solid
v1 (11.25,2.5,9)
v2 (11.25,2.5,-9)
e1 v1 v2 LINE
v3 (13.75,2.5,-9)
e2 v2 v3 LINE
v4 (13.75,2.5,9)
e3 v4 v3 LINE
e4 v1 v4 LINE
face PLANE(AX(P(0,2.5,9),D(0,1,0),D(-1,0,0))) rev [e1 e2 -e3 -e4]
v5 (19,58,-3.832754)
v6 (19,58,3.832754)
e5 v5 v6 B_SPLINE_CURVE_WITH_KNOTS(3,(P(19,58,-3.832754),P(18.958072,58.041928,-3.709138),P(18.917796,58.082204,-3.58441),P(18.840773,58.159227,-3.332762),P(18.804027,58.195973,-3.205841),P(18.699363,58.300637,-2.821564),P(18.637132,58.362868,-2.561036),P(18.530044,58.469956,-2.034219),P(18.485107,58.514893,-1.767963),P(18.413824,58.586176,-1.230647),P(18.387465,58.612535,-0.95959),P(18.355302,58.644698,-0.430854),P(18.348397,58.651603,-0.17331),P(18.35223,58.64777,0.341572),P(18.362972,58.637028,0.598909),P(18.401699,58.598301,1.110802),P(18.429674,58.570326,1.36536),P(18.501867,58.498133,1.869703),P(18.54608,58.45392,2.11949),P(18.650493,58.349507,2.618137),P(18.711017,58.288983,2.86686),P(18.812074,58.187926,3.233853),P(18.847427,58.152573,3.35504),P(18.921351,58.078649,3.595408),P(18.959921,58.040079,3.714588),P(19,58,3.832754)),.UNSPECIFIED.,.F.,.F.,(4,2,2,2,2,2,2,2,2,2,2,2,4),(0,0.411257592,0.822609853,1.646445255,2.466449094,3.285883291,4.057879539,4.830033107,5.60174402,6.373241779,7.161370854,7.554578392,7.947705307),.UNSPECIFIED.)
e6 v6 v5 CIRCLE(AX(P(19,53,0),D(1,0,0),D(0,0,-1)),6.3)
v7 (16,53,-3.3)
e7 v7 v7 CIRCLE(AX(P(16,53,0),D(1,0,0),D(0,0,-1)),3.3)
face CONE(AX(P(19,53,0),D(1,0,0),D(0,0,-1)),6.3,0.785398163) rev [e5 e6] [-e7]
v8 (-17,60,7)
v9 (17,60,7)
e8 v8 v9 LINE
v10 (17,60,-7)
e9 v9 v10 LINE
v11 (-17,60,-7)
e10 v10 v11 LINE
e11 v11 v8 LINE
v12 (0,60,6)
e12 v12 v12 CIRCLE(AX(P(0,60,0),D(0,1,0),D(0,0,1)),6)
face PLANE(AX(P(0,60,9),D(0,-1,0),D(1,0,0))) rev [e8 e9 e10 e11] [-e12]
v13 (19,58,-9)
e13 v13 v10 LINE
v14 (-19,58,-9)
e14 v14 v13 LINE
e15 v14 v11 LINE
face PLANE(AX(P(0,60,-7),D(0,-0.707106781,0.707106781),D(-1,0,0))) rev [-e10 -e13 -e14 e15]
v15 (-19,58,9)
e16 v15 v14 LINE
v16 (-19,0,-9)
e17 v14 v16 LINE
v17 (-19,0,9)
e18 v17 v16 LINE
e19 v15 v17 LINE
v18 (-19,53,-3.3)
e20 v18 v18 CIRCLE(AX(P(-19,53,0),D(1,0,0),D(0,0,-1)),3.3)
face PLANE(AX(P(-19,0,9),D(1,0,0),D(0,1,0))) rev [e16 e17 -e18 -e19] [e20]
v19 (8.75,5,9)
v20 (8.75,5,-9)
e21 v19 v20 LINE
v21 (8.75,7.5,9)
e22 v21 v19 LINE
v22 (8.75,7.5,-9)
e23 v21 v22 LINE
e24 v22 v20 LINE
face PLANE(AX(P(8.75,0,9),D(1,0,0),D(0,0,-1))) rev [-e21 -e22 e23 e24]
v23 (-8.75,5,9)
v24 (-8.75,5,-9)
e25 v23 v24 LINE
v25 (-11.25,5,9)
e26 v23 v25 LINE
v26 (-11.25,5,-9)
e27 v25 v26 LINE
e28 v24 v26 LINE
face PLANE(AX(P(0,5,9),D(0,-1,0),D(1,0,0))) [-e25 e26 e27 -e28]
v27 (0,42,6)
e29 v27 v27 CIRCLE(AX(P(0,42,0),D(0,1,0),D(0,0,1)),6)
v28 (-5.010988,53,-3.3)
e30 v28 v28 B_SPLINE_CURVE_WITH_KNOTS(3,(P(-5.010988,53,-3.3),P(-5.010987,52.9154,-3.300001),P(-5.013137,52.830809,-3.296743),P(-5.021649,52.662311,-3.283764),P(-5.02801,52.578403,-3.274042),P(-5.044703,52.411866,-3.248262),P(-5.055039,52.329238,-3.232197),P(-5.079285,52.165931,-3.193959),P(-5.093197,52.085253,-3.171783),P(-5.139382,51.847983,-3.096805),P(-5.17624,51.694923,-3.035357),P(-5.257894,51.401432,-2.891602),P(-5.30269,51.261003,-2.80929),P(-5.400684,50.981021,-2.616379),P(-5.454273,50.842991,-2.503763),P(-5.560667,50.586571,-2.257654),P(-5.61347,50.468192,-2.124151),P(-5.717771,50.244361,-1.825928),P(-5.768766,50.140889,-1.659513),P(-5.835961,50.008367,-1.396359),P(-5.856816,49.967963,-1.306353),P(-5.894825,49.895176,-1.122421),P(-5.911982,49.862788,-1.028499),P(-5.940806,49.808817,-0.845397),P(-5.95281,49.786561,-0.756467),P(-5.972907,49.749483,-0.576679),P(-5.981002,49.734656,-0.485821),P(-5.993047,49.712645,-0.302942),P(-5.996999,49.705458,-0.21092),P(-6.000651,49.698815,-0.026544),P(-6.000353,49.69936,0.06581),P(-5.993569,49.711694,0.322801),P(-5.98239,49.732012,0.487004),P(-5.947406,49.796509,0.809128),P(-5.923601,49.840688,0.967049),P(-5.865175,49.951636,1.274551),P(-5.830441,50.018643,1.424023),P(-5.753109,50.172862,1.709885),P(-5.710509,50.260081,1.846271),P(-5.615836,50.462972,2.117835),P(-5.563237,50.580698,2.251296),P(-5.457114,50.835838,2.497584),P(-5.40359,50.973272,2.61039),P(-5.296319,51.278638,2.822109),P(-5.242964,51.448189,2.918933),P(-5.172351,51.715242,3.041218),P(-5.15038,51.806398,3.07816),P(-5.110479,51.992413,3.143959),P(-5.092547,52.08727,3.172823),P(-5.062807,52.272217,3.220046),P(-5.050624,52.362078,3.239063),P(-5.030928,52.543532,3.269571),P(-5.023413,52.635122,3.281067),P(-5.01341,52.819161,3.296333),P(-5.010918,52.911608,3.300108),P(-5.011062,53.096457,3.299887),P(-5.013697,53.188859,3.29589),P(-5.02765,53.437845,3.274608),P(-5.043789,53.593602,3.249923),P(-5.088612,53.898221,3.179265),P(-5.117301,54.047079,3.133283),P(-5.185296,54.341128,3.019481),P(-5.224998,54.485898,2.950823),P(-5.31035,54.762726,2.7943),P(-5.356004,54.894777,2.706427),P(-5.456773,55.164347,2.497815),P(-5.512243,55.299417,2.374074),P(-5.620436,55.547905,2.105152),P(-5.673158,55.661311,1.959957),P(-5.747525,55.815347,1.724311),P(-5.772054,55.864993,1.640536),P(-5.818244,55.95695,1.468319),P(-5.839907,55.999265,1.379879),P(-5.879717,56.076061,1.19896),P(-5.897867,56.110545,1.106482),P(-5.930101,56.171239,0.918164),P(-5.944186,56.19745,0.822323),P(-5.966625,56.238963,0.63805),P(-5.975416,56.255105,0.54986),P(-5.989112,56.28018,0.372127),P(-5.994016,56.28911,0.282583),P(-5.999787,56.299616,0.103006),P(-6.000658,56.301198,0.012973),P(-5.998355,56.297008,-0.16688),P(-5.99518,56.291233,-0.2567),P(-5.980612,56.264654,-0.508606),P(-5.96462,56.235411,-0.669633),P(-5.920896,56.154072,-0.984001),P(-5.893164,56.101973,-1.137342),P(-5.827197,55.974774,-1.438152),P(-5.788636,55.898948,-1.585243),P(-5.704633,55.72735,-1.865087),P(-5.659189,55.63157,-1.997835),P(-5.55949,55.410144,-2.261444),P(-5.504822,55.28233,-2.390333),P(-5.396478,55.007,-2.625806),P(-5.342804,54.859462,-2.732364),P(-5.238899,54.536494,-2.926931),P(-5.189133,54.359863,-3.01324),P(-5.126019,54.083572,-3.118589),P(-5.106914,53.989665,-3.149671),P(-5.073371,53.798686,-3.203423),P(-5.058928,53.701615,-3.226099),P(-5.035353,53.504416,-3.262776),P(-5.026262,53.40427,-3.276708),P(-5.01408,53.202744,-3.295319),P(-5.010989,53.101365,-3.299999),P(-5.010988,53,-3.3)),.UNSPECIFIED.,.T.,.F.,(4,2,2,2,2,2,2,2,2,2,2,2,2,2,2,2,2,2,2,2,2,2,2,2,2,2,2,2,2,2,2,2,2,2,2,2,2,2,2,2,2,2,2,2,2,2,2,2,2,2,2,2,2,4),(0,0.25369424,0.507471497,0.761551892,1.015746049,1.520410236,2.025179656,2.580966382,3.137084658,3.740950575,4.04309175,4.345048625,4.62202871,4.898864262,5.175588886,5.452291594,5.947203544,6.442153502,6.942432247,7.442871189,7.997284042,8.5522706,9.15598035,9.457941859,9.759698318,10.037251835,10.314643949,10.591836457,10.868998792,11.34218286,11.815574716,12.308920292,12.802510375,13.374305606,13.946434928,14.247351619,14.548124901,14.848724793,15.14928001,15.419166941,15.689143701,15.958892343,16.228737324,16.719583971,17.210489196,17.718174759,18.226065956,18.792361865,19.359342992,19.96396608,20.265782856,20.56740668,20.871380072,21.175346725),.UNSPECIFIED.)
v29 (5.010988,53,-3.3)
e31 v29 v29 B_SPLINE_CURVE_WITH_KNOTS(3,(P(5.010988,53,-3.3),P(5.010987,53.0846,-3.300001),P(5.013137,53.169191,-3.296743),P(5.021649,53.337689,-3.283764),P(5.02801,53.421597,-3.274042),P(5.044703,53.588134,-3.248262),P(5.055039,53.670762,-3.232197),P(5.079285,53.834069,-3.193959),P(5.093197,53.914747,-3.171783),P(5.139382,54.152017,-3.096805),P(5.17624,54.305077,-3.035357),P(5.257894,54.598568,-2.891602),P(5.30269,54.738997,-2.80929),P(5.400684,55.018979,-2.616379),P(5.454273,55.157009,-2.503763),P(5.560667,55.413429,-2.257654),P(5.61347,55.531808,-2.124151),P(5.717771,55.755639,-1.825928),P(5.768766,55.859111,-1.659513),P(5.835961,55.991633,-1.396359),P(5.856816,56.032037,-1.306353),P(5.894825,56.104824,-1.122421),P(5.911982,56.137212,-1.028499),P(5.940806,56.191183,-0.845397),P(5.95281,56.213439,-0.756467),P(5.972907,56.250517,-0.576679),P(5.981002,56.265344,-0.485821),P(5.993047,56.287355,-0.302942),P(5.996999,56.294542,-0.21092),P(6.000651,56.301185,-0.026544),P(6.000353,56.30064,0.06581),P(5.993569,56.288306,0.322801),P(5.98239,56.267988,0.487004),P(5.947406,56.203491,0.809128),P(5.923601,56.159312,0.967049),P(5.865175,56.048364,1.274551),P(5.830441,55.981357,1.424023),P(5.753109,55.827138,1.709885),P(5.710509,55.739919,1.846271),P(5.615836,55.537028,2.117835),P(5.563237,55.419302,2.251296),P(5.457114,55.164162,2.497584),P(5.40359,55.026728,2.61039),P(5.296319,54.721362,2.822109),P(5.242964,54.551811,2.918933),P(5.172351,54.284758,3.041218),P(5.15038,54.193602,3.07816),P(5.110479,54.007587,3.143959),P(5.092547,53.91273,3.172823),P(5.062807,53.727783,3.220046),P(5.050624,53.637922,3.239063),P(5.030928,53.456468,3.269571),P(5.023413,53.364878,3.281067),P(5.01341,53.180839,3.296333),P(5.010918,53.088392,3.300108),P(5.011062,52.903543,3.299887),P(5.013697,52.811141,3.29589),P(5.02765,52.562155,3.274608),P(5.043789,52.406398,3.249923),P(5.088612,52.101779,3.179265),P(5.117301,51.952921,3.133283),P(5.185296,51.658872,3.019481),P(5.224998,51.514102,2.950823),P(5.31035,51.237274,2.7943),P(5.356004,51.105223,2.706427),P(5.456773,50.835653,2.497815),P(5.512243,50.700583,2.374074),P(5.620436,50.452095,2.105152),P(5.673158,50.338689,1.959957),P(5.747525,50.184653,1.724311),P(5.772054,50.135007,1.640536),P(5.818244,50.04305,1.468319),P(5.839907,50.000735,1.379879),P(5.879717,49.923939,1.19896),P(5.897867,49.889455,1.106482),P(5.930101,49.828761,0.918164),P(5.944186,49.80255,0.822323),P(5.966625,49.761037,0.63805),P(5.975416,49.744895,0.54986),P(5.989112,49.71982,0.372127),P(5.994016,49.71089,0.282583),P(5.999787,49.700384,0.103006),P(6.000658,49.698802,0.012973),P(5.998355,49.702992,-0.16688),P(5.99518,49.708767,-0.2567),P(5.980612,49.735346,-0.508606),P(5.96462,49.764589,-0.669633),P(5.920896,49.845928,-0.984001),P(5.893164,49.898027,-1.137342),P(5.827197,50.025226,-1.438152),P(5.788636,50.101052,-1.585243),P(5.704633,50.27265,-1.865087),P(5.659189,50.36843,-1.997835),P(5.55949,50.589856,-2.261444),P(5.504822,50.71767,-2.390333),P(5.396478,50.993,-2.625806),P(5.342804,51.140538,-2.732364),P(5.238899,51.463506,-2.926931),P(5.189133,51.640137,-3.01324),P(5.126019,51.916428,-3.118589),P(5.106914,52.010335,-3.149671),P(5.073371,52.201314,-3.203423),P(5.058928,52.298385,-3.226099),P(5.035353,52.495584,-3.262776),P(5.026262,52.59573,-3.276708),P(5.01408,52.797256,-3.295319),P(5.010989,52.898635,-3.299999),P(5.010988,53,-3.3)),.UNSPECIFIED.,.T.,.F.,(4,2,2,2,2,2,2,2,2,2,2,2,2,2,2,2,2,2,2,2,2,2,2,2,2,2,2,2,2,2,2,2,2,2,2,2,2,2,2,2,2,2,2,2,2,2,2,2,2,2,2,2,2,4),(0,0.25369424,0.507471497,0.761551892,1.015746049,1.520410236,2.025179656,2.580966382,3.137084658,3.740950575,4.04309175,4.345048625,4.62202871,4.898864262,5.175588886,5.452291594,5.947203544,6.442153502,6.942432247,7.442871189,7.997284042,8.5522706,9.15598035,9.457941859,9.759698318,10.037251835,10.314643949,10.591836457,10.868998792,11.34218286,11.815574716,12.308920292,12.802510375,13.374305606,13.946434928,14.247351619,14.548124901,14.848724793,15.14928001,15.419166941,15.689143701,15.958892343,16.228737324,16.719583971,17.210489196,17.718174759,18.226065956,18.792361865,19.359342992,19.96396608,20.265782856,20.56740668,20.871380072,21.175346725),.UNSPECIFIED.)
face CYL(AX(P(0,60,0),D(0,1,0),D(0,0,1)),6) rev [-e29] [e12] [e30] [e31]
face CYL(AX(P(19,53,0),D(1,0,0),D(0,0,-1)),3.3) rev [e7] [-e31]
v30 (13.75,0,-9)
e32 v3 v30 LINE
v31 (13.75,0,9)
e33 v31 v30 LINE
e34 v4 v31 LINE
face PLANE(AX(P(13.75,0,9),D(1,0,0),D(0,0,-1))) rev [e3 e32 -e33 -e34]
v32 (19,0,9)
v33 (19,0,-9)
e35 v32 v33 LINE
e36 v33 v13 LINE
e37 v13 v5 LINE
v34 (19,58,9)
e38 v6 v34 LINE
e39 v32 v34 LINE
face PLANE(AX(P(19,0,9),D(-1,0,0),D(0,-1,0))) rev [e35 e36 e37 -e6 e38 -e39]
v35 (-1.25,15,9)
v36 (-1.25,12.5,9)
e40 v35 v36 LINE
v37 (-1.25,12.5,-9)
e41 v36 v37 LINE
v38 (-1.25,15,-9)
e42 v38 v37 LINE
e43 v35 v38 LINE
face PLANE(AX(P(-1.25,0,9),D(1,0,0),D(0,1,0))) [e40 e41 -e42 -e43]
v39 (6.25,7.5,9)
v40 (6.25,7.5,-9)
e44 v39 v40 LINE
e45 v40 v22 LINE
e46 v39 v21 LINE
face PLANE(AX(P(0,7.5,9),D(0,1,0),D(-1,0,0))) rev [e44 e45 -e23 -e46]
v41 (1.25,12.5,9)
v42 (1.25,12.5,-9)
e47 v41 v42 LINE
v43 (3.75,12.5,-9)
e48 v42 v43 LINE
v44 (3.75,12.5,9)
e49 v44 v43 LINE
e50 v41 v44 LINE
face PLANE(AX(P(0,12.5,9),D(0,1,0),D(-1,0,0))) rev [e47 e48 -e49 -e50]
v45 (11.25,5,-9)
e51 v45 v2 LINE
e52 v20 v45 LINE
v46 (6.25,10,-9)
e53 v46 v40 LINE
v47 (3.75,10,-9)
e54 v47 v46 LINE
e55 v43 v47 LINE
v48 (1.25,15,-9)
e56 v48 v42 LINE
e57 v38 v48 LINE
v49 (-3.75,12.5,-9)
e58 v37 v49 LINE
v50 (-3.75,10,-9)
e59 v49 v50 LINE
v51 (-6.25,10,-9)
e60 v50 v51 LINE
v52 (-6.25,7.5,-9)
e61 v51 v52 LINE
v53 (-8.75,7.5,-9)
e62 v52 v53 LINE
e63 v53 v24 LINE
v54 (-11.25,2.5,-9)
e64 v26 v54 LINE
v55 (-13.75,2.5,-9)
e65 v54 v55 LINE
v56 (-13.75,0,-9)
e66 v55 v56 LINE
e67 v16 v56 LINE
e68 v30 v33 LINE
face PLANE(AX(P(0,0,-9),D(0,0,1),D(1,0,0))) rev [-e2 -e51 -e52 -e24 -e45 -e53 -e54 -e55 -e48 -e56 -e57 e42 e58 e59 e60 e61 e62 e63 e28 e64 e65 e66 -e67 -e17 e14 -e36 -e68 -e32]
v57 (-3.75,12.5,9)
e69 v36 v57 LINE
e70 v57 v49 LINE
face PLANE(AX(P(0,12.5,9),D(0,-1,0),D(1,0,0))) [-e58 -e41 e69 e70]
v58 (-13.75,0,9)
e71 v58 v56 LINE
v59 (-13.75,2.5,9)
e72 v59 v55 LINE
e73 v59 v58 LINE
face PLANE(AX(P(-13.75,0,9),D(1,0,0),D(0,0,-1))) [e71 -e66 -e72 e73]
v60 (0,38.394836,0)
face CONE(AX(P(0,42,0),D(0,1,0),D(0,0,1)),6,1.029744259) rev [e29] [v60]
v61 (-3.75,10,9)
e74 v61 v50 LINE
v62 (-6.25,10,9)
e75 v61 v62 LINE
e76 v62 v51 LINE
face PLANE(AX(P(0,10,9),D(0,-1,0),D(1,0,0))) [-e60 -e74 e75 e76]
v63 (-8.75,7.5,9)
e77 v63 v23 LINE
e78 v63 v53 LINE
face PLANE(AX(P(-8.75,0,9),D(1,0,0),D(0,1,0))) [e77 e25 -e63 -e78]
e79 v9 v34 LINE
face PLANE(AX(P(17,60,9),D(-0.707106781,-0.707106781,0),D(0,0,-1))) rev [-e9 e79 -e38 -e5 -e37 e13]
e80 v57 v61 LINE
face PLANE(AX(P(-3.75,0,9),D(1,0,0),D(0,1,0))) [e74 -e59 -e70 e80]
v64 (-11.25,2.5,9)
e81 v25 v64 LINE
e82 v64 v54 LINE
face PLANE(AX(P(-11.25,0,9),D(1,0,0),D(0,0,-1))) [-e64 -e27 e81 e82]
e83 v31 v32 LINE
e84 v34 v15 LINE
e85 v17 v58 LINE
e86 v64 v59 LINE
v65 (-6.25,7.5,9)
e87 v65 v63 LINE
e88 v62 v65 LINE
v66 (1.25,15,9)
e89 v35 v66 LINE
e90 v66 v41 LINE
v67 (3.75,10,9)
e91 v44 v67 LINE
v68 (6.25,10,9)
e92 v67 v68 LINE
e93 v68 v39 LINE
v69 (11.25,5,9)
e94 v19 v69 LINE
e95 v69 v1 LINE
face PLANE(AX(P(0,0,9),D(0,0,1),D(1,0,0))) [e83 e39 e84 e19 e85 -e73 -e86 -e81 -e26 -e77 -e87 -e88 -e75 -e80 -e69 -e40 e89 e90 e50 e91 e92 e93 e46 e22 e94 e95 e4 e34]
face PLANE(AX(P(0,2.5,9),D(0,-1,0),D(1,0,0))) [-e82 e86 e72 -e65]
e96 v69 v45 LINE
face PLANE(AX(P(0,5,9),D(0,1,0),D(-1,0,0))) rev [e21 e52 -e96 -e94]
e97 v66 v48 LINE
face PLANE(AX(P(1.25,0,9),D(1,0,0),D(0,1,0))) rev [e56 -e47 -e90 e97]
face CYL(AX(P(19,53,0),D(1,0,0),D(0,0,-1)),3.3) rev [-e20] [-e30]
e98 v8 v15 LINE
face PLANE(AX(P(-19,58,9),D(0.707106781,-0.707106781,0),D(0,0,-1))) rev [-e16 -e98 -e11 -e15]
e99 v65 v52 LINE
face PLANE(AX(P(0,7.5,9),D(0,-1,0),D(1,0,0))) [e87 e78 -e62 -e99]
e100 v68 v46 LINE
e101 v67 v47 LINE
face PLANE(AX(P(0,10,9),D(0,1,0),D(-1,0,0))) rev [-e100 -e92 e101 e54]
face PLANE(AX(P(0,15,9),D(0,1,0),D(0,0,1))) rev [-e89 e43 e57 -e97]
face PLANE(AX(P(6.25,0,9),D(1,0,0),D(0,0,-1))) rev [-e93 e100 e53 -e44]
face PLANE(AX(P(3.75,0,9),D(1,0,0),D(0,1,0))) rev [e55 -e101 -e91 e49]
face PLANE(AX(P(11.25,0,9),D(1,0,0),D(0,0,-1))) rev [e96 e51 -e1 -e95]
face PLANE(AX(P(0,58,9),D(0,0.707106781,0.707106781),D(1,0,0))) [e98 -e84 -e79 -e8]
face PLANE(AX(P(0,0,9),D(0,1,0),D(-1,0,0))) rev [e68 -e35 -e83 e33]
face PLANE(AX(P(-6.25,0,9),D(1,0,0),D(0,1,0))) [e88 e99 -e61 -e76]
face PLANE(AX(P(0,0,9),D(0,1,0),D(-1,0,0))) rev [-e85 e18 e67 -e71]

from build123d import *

# Parameters (mm, degrees)
BOSS_EXTRUDE1_DEPTH                             = 9
F_12_0MM_DOWEL_HOLE1_D                          = 12
F_12_0MM_DOWEL_HOLE1_DEPTH                      = 18
F_12_0MM_DOWEL_HOLE1_TIP                        = 3.605163714
CSK_FOR_M6_FLAT_HEAD_MACHINE_SCREW2_D           = 6.6
CSK_FOR_M6_FLAT_HEAD_MACHINE_SCREW2_DEPTH       = 38
CSK_FOR_M6_FLAT_HEAD_MACHINE_SCREW2_CSINK_D     = 12.6
CSK_FOR_M6_FLAT_HEAD_MACHINE_SCREW2_CSINK_ANGLE = 90
CSK_FOR_M6_FLAT_HEAD_MACHINE_SCREW2_TIP         = 1.982840043
CHAMFER1_SIZE                                   = 2


with BuildPart() as part:
    # Sketch1 → Boss-Extrude1 (new, symmetric)
    with BuildSketch(Plane.XY):
        Polygon((19, 60), (-19, 60), (-19, 0), (-13.75, 0), (-13.75, 2.5), (-11.25, 2.5), (-11.25, 5), (-8.75, 5), (-8.75, 7.5), (-6.25, 7.5), (-6.25, 10), (-3.75, 10), (-3.75, 12.5), (-1.25, 12.5), (-1.25, 15), (1.25, 15), (1.25, 12.5), (3.75, 12.5), (3.75, 10), (6.25, 10), (6.25, 7.5), (8.75, 7.5), (8.75, 5), (11.25, 5), (11.25, 2.5), (13.75, 2.5), (13.75, 0), (19, 0), align=None)
    extrude(amount=BOSS_EXTRUDE1_DEPTH, both=True)

    # Ø12.0mm Dowel Hole1
    with Locations(Plane(origin=(0, 60, 0), x_dir=(1, 0, 0), z_dir=(0, 1, 0))):
        with Locations((0, 0)):
            Hole(F_12_0MM_DOWEL_HOLE1_D / 2, depth=F_12_0MM_DOWEL_HOLE1_DEPTH)
            with Locations((0, 0, -(F_12_0MM_DOWEL_HOLE1_DEPTH + F_12_0MM_DOWEL_HOLE1_TIP / 2))):  # 118° drill point
                Cone(0, F_12_0MM_DOWEL_HOLE1_D / 2, F_12_0MM_DOWEL_HOLE1_TIP, mode=Mode.SUBTRACT)

    # CSK for M6 Flat Head Machine Screw2
    with Locations(Plane(origin=(19, 0, 0), x_dir=(0, 0, -1), z_dir=(1, 0, 0))):
        with Locations((0, 53)):
            CounterSinkHole(CSK_FOR_M6_FLAT_HEAD_MACHINE_SCREW2_D / 2, CSK_FOR_M6_FLAT_HEAD_MACHINE_SCREW2_CSINK_D / 2, depth=CSK_FOR_M6_FLAT_HEAD_MACHINE_SCREW2_DEPTH, counter_sink_angle=CSK_FOR_M6_FLAT_HEAD_MACHINE_SCREW2_CSINK_ANGLE)
            with Locations((0, 0, -(CSK_FOR_M6_FLAT_HEAD_MACHINE_SCREW2_DEPTH + CSK_FOR_M6_FLAT_HEAD_MACHINE_SCREW2_TIP / 2))):  # 118° drill point
                Cone(0, CSK_FOR_M6_FLAT_HEAD_MACHINE_SCREW2_D / 2, CSK_FOR_M6_FLAT_HEAD_MACHINE_SCREW2_TIP, mode=Mode.SUBTRACT)

    # Chamfer1
    # the kernel refuses this chamfer: 2 mm, written as the material it takes off along each edge
    with BuildSketch(Plane(origin=(24.143365976, 60, -9), x_dir=(0, 0.027495876610585623, 0.9996219169112968), z_dir=(-1, 0, 0))) as chamfer1_piece_1:
        Polygon((CHAMFER1_SIZE * 0.999621916911, -CHAMFER1_SIZE * 0.0274958766106), (-CHAMFER1_SIZE * 0.0274958766106, -CHAMFER1_SIZE * 0.999621916911), (0, 0), align=None)
    extrude(amount=48.286731952, mode=Mode.SUBTRACT)
    with BuildSketch(Plane(origin=(-19, 60, -14.143365976), x_dir=(-0.027495876610585647, -0.9996219169112968, 0), z_dir=(0, 0, 1)), Plane(origin=(19, 60, -14.143365976), x_dir=(-0.9996219169112968, 0.027495876610585647, 0), z_dir=(0, 0, 1))) as chamfer1_piece_2:
        Polygon((CHAMFER1_SIZE * 0.999621916911, CHAMFER1_SIZE * 0.0274958766106), (-CHAMFER1_SIZE * 0.0274958766106, CHAMFER1_SIZE * 0.999621916911), (0, 0), align=None)
    extrude(amount=28.286731952, mode=Mode.SUBTRACT)
    with BuildSketch(Plane(origin=(24.143365976, 60, 9), x_dir=(0, 0.027495876610585623, -0.9996219169112968), z_dir=(-1, 0, 0))) as chamfer1_piece_3:
        Polygon((CHAMFER1_SIZE * 0.999621916911, CHAMFER1_SIZE * 0.0274958766106), (-CHAMFER1_SIZE * 0.0274958766106, CHAMFER1_SIZE * 0.999621916911), (0, 0), align=None)
    extrude(amount=48.286731952, mode=Mode.SUBTRACT)


solid = part.part
